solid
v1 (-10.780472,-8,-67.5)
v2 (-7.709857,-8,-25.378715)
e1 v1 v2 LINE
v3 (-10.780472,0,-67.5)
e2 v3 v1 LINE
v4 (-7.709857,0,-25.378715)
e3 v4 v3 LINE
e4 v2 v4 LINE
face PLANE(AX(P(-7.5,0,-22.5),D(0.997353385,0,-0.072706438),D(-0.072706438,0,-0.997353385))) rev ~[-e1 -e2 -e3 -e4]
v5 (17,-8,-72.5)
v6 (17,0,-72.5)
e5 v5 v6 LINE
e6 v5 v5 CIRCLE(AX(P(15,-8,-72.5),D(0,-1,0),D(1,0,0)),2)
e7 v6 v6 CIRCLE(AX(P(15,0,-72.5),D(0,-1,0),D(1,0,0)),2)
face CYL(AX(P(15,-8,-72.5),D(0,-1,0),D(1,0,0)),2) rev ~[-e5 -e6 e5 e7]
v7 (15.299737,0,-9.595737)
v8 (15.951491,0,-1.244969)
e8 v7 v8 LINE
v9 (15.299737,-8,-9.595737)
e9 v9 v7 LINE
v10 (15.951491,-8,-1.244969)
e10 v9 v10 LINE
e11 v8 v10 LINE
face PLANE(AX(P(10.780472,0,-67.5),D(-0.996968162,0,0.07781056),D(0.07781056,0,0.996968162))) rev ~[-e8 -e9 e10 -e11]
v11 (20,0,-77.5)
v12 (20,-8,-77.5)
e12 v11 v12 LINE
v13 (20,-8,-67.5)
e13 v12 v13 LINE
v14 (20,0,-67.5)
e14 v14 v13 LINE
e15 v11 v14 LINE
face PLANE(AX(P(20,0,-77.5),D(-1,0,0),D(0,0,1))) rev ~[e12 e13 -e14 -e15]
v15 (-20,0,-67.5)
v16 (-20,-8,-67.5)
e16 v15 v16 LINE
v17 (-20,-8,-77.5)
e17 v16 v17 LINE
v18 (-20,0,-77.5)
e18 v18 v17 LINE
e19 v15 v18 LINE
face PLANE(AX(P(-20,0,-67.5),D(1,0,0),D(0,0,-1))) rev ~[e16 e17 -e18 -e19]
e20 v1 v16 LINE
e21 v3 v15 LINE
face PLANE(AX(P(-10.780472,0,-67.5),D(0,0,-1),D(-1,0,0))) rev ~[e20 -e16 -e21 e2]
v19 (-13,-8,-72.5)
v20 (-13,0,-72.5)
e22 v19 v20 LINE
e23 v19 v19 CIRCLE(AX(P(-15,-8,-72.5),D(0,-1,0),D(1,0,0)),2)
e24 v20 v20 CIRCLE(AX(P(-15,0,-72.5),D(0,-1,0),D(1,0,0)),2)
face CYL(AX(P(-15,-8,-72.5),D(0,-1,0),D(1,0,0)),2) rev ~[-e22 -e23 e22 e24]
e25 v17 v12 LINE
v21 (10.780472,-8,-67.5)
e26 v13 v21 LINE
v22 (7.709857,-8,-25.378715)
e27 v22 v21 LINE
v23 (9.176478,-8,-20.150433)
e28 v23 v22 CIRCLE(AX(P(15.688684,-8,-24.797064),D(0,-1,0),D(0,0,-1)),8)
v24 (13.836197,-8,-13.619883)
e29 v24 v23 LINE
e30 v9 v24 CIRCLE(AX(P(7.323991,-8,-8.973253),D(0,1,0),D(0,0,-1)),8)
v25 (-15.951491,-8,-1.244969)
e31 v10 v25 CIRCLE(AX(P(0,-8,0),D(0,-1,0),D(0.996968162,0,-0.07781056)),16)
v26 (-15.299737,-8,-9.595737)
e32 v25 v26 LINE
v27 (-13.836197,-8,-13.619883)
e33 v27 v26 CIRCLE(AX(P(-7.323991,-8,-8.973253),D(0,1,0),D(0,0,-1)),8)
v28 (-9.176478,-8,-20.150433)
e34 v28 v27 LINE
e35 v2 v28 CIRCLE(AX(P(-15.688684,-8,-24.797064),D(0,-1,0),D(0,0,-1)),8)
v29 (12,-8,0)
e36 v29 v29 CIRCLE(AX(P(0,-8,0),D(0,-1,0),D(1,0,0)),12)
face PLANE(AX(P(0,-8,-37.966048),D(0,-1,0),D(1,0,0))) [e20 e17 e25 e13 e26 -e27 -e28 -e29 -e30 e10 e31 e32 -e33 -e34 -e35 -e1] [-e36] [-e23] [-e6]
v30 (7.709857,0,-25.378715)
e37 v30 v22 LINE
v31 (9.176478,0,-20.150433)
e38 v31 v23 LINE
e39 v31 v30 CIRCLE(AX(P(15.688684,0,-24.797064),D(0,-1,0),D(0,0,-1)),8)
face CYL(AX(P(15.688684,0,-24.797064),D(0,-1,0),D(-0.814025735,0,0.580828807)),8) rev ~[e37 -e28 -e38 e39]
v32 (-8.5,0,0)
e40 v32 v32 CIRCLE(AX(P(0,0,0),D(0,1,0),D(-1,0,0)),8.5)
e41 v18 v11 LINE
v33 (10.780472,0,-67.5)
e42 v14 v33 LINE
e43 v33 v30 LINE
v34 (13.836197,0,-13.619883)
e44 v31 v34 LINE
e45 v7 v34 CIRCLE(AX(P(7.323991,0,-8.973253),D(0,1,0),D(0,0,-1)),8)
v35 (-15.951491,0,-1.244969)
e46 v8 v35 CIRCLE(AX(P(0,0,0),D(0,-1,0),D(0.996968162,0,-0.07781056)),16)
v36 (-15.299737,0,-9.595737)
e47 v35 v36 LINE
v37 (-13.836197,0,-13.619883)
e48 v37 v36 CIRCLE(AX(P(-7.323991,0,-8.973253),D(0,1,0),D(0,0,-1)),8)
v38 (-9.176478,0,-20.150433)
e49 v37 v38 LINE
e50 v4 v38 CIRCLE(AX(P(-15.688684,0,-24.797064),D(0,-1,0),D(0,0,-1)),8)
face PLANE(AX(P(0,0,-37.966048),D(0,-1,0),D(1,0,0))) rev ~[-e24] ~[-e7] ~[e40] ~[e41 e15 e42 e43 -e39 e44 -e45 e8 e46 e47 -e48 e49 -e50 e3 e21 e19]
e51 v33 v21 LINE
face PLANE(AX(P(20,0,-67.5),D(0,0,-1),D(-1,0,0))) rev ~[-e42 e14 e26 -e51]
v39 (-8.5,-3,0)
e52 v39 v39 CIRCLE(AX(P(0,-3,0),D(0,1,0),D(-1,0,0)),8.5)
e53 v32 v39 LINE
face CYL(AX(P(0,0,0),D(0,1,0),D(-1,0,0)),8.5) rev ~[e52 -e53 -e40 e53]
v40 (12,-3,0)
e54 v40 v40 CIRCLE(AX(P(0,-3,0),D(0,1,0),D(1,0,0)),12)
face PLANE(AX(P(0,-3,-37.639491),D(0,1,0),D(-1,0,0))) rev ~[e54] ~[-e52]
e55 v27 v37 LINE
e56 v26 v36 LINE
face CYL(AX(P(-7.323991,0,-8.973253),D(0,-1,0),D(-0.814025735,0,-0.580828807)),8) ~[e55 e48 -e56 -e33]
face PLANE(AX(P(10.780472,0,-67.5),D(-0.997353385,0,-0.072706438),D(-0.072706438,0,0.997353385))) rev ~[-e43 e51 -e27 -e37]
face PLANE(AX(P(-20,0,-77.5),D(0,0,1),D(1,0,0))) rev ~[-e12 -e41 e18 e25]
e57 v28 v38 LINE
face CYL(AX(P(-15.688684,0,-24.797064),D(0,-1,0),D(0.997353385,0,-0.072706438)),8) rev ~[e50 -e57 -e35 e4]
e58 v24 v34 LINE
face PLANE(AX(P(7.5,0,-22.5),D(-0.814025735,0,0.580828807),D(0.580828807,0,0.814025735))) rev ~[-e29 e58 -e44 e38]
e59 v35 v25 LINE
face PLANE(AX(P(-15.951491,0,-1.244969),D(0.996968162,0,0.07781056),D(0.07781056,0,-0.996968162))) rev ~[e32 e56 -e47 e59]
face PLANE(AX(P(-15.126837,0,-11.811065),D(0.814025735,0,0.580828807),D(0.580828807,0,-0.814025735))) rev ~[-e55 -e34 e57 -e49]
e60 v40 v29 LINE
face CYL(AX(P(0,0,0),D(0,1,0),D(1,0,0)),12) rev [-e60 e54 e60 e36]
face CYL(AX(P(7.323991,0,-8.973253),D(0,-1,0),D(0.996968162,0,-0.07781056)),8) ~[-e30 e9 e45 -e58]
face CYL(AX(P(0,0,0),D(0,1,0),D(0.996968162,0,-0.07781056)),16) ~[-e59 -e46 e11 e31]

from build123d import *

# Parameters (mm, degrees)
F0_R     = 12
F1_DEPTH = 8
F3_DEPTH = 25
F4_R     = 8
F5_R     = 12
F5_R_2   = 8.5
F6_DEPTH = 3
F7_R     = 2
F8_DEPTH = 25


with BuildPart() as f1:
    # F0 (on Front) → F1 (new body)
    with BuildSketch(Plane.XZ):
        with BuildLine():
            Line((10.7804718609, -67.5), (15.9514905981, -1.2449689551))
            ThreePointArc((15.9514905981, -1.2449689551), (0, 16), (-15.9514905981, -1.2449689551))
            Line((-15.9514905981, -1.2449689551), (-10.7804718609, -67.5))
            Line((-10.7804718609, -67.5), (-20, -67.5))
            Line((-20, -67.5), (-20, -77.5))
            Line((-20, -77.5), (-10, -77.5))
            Line((-10, -77.5), (10, -77.5))
            Line((10, -77.5), (20, -77.5))
            Line((20, -77.5), (20, -67.5))
            Line((20, -67.5), (10.7804718609, -67.5))
        make_face()
        Circle(F0_R, mode=Mode.SUBTRACT)
    extrude(amount=F1_DEPTH)

    # F2 (on face) → F3 (cut)
    with BuildSketch(Plane(origin=(0, 0, 0), x_dir=(-1, 0, 0), z_dir=(0, 1, 0))):
        Polygon((-7.5, -22.5), (-15.1268365117, -11.8110652832), (-10.7804718609, -67.5), align=None)
        Polygon((10.7804718609, -67.5), (15.1268365117, -11.8110652832), (7.5, -22.5), align=None)
    extrude(amount=-F3_DEPTH, mode=Mode.SUBTRACT)

    # F4
    f4_edges = [f1.edges().sort_by_distance(p)[0] for p in [
        (-7.5, -4, -22.5),
        (-15.126837, -4, -11.811065),
        (15.126837, -4, -11.811065),
        (7.5, -4, -22.5),
    ]]
    fillet(f4_edges, radius=F4_R)

    # F5 (on face) → F6 (join)
    with BuildSketch(Plane(origin=(0, 0, 0), x_dir=(-1, 0, 0), z_dir=(0, 1, 0))):
        with BuildLine():
            Line((20, -67.5), (10.7804718609, -67.5))
            Line((10.7804718609, -67.5), (7.7098565421, -25.3787152568))
            ThreePointArc((7.7098565421, -25.3787152568), (7.9860060263, -22.6363328806), (9.1764777393, -20.150433298))
            Line((9.1764777393, -20.150433298), (13.8361972063, -13.6198832981))
            ThreePointArc((13.8361972063, -13.6198832981), (14.8422105338, -11.7075498191), (15.2997366254, -9.5957373215))
            Line((15.2997366254, -9.5957373215), (15.9514905981, -1.2449689551))
            ThreePointArc((15.9514905981, -1.2449689551), (0, 16), (-15.9514905981, -1.2449689551))
            Line((-15.9514905981, -1.2449689551), (-15.2997366254, -9.5957373215))
            ThreePointArc((-15.2997366254, -9.5957373215), (-14.8422105338, -11.7075498191), (-13.8361972063, -13.6198832981))
            Line((-13.8361972063, -13.6198832981), (-9.1764777393, -20.150433298))
            ThreePointArc((-9.1764777393, -20.150433298), (-7.9860060263, -22.6363328806), (-7.7098565421, -25.3787152568))
            Line((-7.7098565421, -25.3787152568), (-10.7804718609, -67.5))
            Line((-10.7804718609, -67.5), (-20, -67.5))
            Line((-20, -67.5), (-20, -77.5))
            Line((-20, -77.5), (20, -77.5))
            Line((20, -77.5), (20, -67.5))
        make_face()
        Circle(F5_R, mode=Mode.SUBTRACT)
        Circle(F5_R)
        Circle(F5_R_2, mode=Mode.SUBTRACT)
    extrude(amount=-F6_DEPTH)

    # F7 (on face) → F8 (cut)
    with BuildSketch(Plane.XZ.offset(8)):
        with Locations((-15, -72.5)):
            Circle(F7_R)
        with Locations((15, -72.5)):
            Circle(F7_R)
    extrude(amount=-F8_DEPTH, mode=Mode.SUBTRACT)


solid = f1.part
